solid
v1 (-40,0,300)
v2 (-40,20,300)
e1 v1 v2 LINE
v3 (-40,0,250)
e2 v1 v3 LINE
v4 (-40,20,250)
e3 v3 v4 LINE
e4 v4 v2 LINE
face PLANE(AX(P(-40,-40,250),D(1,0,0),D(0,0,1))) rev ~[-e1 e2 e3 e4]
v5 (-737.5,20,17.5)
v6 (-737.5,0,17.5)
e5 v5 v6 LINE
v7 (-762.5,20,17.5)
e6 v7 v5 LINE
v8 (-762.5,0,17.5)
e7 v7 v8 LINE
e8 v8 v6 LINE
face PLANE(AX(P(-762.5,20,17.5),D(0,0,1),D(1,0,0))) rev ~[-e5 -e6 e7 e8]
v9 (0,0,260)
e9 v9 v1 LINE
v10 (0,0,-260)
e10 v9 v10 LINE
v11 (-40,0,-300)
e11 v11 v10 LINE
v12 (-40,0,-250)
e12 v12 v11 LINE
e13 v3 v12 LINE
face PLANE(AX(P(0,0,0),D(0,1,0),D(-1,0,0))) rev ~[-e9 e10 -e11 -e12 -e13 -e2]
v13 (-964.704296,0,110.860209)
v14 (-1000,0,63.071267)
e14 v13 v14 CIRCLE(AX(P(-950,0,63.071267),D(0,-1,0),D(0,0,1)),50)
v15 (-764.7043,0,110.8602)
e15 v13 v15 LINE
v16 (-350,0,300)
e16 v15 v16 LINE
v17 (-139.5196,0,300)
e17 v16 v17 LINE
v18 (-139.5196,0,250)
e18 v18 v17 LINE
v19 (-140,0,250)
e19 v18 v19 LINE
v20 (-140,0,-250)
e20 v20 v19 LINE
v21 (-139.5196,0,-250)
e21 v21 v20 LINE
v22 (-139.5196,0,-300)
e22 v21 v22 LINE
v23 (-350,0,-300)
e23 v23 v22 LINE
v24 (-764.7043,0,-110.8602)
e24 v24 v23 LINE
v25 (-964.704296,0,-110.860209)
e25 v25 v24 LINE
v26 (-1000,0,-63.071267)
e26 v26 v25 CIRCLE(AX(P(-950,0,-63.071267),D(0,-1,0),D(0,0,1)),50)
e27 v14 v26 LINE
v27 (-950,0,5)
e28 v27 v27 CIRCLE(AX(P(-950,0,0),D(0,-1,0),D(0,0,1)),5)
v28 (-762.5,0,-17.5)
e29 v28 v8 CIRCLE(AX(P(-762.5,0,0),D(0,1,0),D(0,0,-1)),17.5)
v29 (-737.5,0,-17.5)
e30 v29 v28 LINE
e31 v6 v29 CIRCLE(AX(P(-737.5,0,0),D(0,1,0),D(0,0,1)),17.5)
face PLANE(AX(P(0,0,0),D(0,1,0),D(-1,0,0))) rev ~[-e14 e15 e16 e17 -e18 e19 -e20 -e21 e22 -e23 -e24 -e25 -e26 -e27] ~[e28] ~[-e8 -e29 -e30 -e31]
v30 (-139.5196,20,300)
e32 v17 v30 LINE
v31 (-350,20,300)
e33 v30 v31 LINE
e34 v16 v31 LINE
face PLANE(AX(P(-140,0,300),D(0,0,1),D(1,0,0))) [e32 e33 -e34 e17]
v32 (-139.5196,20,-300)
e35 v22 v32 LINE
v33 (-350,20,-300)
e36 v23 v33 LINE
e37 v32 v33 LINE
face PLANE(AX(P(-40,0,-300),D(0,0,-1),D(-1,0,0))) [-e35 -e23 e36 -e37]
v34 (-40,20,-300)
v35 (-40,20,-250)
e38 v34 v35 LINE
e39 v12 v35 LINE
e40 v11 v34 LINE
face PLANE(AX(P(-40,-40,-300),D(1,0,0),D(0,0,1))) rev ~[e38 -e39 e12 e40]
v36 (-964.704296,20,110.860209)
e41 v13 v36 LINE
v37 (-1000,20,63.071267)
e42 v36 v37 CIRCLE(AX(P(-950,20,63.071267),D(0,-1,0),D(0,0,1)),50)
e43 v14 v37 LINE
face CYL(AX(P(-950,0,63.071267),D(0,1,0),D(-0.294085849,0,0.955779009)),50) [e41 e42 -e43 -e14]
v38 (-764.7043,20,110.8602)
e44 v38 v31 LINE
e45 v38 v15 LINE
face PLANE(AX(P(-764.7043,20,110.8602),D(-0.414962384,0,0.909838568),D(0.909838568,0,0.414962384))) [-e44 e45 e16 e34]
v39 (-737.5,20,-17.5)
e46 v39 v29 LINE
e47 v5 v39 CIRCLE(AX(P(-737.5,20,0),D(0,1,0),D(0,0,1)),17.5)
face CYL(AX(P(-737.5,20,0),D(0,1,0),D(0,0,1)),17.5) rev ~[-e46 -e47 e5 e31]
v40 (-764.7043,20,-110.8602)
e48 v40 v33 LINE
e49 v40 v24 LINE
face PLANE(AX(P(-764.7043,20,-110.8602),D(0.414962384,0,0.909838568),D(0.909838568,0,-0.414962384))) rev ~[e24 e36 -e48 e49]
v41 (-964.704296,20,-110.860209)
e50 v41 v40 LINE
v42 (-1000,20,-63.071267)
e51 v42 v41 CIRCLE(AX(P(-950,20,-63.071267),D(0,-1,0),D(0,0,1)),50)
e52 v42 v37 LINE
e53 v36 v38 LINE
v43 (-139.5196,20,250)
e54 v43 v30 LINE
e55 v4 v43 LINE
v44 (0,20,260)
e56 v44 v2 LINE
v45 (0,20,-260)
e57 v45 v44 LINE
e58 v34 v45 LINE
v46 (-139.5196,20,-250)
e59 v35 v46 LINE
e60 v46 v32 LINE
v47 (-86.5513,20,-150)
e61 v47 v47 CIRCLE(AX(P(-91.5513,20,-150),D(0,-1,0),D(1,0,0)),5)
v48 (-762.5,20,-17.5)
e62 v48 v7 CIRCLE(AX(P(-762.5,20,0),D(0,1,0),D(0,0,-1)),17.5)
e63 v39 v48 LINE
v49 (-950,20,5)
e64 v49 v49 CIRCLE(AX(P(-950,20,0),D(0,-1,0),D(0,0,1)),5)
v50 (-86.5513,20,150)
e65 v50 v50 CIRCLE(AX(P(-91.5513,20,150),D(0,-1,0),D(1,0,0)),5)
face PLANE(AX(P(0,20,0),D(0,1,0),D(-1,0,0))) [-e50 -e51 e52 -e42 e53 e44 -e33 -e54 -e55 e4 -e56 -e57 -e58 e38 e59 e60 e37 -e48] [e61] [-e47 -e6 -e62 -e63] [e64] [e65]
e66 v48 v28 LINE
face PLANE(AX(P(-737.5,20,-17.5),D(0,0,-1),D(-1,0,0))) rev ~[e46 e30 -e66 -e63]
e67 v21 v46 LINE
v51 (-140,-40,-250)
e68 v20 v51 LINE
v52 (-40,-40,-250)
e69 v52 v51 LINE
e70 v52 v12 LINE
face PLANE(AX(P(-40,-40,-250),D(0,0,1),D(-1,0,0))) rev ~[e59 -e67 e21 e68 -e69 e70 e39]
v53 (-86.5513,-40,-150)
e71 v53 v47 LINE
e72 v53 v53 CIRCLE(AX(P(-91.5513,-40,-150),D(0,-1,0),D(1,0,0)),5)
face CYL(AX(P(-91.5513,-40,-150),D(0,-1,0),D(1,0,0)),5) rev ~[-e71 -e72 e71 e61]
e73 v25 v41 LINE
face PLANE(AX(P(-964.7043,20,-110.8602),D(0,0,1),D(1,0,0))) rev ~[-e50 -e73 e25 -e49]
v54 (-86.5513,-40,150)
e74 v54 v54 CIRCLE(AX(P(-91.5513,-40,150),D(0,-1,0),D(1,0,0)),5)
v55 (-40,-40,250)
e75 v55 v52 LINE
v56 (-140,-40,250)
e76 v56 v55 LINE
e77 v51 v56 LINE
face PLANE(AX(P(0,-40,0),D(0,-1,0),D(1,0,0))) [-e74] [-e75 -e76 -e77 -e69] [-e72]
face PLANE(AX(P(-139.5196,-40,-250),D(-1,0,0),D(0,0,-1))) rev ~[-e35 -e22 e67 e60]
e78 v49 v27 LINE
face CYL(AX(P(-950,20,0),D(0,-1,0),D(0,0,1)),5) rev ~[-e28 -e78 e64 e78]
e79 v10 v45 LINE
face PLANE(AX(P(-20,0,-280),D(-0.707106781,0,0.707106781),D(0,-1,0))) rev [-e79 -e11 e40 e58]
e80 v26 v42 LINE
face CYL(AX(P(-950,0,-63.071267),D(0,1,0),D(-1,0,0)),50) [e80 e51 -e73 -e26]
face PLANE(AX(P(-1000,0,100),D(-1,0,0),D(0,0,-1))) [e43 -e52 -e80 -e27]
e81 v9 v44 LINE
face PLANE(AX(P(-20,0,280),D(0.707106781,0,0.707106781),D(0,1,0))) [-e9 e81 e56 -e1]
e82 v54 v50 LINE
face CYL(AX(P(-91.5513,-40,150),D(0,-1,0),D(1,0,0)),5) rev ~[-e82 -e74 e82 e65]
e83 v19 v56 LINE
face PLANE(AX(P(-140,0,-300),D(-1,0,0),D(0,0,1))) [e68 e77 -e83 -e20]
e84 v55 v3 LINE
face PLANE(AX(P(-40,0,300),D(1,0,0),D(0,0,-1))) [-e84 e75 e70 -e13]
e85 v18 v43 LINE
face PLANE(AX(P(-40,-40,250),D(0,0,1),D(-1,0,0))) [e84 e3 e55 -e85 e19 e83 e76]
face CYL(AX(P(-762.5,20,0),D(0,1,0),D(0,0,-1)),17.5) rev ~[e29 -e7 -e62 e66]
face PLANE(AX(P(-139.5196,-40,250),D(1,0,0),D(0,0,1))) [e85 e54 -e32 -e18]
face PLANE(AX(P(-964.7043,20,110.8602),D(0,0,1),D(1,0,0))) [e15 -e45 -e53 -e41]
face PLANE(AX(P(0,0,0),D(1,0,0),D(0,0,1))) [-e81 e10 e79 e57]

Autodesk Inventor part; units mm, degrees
ref_plane "YZ Plane" through (0, 0, 0) normal (1, 0, 0) x (0, 1, 0)
ref_plane "XZ Plane" through (0, 0, 0) normal (0, 1, 0) x (-1, 0, 0)
ref_plane "XY Plane" through (0, 0, 0) normal (0, 0, 1) x (1, 0, 0)
sketch "Sketch1" plane through (0, 0, 0) normal (0, 1, 0) x (-1, 0, 0)
  line L0 (0, 0) -> (0, 300)
  line L1 (0, 300) -> (350, 300)
  line L2 (350, 300) -> (1000, 100)
  line L3 (0, 0) -> (1000, 0)
  line L4 (1000, 100) -> (1000, 0)
  line L5 (0, 0) -> (0, -300)
  line L6 (0, -300) -> (350, -300)
  line L7 (350, -300) -> (1000, -100)
  line L8 (1000, -100) -> (1000, 0)
  line L9 (350, 300) -> (350, -300)
  dimension "d12" = 300
  dimension "d13" = 350
  dimension "d16" = 100
extrude "Extrusion1" add sketch "Sketch1" along normal blind 20
fillet "Fillet1" radius 50 1 edges at (-1000, 10, 100)
fillet "Fillet2" radius 50 1 edges at (-1000, 10, -100)
chamfer "Chamfer1" distance 40 angle 45 1 edges at (0, 10, -300)
chamfer "Chamfer2" distance 40 angle 45 1 edges at (0, 10, 300)
sketch "Sketch3" plane through (0, 20, 0) normal (0, 1, 0) x (1, 0, 0)
  point P0 (0, 0)
sketch "Sketch4" plane through (0, 20, 0) normal (0, 1, 0) x (1, 0, 0)
  point P0 (0, 0)
sketch "Sketch5" plane through (0, 20, 0) normal (0, 1, 0) x (1, 0, 0)
  line L0 (-780, 0) -> (-720, 0) construction
  line L1 (-762.5, -17.5) -> (-737.5, -17.5)
  line L2 (-737.5, 17.5) -> (-762.5, 17.5)
  arc A0 (-762.5, 17.5) -> (-762.5, -17.5) centre (-762.5, 0) ccw
  arc A1 (-737.5, -17.5) -> (-737.5, 17.5) centre (-737.5, 0) ccw
  line L3 (-1000, 63.0713) -> (-1000, -63.0713) projected
  point P0 (0, 0)
  point P1 (-750, 0)
  dimension "d27" = 60
  dimension "d28" = 35
extrude "Extrusion2" cut sketch "Sketch5" against normal blind 20
sketch "Sketch6" plane through (0, 20, 0) normal (0, 1, 0) x (1, 0, 0)
  line L0 (-1000, 63.0713) -> (-1000, -63.0713) projected
  line L1 (-1000, 0) -> (-950, 0)
  point P0 (0, 0)
  dimension "d33" = 50
hole "Hole1" at (-950, 20, 0) direction (0, -1, 0) diameter 10 end through all
sketch "Sketch7" plane through (0, 0, 0) normal (0, -1, 0) x (1, 0, 0)
  line L0 (-350, 300) -> (-40, 300) projected
  line L1 (0, -260) -> (-40, -300) projected
  line L2 (-40, 300) -> (-40, -300)
  line L3 (-40, -300) -> (-140, -300)
  line L4 (-140, -300) -> (-140, 300)
  line L5 (-140, 300) -> (-40, 300)
  point P0 (0, 0)
  dimension "d41" = 100
extrude "Extrusion3" add sketch "Sketch7" along normal blind 40
sketch "Sketch8" plane through (0, -40, 0) normal (0, -1, 0) x (1, 0, 0)
  line L0 (-350, 300) -> (-40, 300) projected
  circle A0 centre (-91.5513, 150) radius 5
  line L1 (-40, -300) -> (-40, 300) projected
  line L2 (-40, 0) -> (-140, 0)
  line L3 (-140, -300) -> (-140, 300) projected
  circle A1 centre (-91.5513, -150) radius 5
  point P0 (0, 0)
  dimension "d45" = 10
extrude "Extrusion4" cut sketch "Sketch8" against normal blind 60 contours A0 | A1
sketch "Sketch9" plane through (0, -40, 0) normal (0, -1, 0) x (1, 0, 0)
  line L0 (-40, -300) -> (-350, -300) projected
  line L1 (-139.5196, -300) -> (-39.5196, -300)
  line L2 (-39.5196, -300) -> (-39.5196, -250)
  line L3 (-39.5196, -250) -> (-139.5196, -250)
  line L4 (-139.5196, -250) -> (-139.5196, -300)
  line L5 (-40, -300) -> (-40, 300) projected
  line L6 (-40, 0) -> (-139.5196, 0)
  line L7 (-40, 300) -> (-350, 300)
  line L8 (-39.5196, 300) -> (-39.5196, 250)
  line L9 (-39.5196, 250) -> (-139.5196, 250)
  line L10 (-139.5196, 250) -> (-139.5196, 300)
  point P0 (0, 0)
  point P1 (-40, 250)
  point P2 (-40, -250)
  dimension "d48" = 100
  dimension "d49" = 50
extrude "Extrusion5" cut sketch "Sketch9" against normal blind 60 contours L0 L4 L3 L5 | L9 L10 L7 L5
sketch "Sketch10" plane through (0, 20, 0) normal (0, 1, 0) x (1, 0, 0)
  line L0 (-350, 300) -> (-964.7043, 110.8602) projected
  line L1 (-964.7043, 110.8602) -> (-764.7043, 110.8602)
  line L2 (-764.7043, 110.8602) -> (-350, 300)
  line L3 (-964.7043, -110.8602) -> (-350, -300) projected
  line L4 (-964.7043, -110.8602) -> (-764.7043, -110.8602)
  line L5 (-764.7043, -110.8602) -> (-350, -300)
  point P0 (0, 0)
  dimension "d53" = 200
extrude "Extrusion6" cut sketch "Sketch10" against normal blind 20
sketch "Sketch11" plane through (-139.5196, -40, 300) normal (1, 0, 0) x (0, 0, -1)
  line L0 (600, 40) -> (0, 40) projected
  line L1 (0, 40) -> (50, 40)
  line L2 (50, 0) -> (50, 60) projected
  line L3 (50, 0) -> (50, 40)
  line L4 (0, 0) -> (600, 0) projected
  line L5 (0, 40) -> (0, 0)
  line L6 (0, 0) -> (50, 0)
  point P0 (300, 40)
extrude "Extrusion7" cut sketch "Sketch11" against normal blind 1
sketch "Sketch12" plane through (-139.5196, -40, -250) normal (1, 0, 0) x (0, 0, -1)
  line L0 (50, 0) -> (0, 0) projected
  line L1 (0, 0) -> (0, 40) projected
  line L2 (50, 0) -> (0, 0)
  line L3 (0, 0) -> (0, 40)
  line L4 (0, 40) -> (50, 40)
  line L5 (50, 40) -> (50, 0)
  point P0 (-250, 40)
extrude "Extrusion8" cut sketch "Sketch12" against normal blind 1
properties part number "Base"
